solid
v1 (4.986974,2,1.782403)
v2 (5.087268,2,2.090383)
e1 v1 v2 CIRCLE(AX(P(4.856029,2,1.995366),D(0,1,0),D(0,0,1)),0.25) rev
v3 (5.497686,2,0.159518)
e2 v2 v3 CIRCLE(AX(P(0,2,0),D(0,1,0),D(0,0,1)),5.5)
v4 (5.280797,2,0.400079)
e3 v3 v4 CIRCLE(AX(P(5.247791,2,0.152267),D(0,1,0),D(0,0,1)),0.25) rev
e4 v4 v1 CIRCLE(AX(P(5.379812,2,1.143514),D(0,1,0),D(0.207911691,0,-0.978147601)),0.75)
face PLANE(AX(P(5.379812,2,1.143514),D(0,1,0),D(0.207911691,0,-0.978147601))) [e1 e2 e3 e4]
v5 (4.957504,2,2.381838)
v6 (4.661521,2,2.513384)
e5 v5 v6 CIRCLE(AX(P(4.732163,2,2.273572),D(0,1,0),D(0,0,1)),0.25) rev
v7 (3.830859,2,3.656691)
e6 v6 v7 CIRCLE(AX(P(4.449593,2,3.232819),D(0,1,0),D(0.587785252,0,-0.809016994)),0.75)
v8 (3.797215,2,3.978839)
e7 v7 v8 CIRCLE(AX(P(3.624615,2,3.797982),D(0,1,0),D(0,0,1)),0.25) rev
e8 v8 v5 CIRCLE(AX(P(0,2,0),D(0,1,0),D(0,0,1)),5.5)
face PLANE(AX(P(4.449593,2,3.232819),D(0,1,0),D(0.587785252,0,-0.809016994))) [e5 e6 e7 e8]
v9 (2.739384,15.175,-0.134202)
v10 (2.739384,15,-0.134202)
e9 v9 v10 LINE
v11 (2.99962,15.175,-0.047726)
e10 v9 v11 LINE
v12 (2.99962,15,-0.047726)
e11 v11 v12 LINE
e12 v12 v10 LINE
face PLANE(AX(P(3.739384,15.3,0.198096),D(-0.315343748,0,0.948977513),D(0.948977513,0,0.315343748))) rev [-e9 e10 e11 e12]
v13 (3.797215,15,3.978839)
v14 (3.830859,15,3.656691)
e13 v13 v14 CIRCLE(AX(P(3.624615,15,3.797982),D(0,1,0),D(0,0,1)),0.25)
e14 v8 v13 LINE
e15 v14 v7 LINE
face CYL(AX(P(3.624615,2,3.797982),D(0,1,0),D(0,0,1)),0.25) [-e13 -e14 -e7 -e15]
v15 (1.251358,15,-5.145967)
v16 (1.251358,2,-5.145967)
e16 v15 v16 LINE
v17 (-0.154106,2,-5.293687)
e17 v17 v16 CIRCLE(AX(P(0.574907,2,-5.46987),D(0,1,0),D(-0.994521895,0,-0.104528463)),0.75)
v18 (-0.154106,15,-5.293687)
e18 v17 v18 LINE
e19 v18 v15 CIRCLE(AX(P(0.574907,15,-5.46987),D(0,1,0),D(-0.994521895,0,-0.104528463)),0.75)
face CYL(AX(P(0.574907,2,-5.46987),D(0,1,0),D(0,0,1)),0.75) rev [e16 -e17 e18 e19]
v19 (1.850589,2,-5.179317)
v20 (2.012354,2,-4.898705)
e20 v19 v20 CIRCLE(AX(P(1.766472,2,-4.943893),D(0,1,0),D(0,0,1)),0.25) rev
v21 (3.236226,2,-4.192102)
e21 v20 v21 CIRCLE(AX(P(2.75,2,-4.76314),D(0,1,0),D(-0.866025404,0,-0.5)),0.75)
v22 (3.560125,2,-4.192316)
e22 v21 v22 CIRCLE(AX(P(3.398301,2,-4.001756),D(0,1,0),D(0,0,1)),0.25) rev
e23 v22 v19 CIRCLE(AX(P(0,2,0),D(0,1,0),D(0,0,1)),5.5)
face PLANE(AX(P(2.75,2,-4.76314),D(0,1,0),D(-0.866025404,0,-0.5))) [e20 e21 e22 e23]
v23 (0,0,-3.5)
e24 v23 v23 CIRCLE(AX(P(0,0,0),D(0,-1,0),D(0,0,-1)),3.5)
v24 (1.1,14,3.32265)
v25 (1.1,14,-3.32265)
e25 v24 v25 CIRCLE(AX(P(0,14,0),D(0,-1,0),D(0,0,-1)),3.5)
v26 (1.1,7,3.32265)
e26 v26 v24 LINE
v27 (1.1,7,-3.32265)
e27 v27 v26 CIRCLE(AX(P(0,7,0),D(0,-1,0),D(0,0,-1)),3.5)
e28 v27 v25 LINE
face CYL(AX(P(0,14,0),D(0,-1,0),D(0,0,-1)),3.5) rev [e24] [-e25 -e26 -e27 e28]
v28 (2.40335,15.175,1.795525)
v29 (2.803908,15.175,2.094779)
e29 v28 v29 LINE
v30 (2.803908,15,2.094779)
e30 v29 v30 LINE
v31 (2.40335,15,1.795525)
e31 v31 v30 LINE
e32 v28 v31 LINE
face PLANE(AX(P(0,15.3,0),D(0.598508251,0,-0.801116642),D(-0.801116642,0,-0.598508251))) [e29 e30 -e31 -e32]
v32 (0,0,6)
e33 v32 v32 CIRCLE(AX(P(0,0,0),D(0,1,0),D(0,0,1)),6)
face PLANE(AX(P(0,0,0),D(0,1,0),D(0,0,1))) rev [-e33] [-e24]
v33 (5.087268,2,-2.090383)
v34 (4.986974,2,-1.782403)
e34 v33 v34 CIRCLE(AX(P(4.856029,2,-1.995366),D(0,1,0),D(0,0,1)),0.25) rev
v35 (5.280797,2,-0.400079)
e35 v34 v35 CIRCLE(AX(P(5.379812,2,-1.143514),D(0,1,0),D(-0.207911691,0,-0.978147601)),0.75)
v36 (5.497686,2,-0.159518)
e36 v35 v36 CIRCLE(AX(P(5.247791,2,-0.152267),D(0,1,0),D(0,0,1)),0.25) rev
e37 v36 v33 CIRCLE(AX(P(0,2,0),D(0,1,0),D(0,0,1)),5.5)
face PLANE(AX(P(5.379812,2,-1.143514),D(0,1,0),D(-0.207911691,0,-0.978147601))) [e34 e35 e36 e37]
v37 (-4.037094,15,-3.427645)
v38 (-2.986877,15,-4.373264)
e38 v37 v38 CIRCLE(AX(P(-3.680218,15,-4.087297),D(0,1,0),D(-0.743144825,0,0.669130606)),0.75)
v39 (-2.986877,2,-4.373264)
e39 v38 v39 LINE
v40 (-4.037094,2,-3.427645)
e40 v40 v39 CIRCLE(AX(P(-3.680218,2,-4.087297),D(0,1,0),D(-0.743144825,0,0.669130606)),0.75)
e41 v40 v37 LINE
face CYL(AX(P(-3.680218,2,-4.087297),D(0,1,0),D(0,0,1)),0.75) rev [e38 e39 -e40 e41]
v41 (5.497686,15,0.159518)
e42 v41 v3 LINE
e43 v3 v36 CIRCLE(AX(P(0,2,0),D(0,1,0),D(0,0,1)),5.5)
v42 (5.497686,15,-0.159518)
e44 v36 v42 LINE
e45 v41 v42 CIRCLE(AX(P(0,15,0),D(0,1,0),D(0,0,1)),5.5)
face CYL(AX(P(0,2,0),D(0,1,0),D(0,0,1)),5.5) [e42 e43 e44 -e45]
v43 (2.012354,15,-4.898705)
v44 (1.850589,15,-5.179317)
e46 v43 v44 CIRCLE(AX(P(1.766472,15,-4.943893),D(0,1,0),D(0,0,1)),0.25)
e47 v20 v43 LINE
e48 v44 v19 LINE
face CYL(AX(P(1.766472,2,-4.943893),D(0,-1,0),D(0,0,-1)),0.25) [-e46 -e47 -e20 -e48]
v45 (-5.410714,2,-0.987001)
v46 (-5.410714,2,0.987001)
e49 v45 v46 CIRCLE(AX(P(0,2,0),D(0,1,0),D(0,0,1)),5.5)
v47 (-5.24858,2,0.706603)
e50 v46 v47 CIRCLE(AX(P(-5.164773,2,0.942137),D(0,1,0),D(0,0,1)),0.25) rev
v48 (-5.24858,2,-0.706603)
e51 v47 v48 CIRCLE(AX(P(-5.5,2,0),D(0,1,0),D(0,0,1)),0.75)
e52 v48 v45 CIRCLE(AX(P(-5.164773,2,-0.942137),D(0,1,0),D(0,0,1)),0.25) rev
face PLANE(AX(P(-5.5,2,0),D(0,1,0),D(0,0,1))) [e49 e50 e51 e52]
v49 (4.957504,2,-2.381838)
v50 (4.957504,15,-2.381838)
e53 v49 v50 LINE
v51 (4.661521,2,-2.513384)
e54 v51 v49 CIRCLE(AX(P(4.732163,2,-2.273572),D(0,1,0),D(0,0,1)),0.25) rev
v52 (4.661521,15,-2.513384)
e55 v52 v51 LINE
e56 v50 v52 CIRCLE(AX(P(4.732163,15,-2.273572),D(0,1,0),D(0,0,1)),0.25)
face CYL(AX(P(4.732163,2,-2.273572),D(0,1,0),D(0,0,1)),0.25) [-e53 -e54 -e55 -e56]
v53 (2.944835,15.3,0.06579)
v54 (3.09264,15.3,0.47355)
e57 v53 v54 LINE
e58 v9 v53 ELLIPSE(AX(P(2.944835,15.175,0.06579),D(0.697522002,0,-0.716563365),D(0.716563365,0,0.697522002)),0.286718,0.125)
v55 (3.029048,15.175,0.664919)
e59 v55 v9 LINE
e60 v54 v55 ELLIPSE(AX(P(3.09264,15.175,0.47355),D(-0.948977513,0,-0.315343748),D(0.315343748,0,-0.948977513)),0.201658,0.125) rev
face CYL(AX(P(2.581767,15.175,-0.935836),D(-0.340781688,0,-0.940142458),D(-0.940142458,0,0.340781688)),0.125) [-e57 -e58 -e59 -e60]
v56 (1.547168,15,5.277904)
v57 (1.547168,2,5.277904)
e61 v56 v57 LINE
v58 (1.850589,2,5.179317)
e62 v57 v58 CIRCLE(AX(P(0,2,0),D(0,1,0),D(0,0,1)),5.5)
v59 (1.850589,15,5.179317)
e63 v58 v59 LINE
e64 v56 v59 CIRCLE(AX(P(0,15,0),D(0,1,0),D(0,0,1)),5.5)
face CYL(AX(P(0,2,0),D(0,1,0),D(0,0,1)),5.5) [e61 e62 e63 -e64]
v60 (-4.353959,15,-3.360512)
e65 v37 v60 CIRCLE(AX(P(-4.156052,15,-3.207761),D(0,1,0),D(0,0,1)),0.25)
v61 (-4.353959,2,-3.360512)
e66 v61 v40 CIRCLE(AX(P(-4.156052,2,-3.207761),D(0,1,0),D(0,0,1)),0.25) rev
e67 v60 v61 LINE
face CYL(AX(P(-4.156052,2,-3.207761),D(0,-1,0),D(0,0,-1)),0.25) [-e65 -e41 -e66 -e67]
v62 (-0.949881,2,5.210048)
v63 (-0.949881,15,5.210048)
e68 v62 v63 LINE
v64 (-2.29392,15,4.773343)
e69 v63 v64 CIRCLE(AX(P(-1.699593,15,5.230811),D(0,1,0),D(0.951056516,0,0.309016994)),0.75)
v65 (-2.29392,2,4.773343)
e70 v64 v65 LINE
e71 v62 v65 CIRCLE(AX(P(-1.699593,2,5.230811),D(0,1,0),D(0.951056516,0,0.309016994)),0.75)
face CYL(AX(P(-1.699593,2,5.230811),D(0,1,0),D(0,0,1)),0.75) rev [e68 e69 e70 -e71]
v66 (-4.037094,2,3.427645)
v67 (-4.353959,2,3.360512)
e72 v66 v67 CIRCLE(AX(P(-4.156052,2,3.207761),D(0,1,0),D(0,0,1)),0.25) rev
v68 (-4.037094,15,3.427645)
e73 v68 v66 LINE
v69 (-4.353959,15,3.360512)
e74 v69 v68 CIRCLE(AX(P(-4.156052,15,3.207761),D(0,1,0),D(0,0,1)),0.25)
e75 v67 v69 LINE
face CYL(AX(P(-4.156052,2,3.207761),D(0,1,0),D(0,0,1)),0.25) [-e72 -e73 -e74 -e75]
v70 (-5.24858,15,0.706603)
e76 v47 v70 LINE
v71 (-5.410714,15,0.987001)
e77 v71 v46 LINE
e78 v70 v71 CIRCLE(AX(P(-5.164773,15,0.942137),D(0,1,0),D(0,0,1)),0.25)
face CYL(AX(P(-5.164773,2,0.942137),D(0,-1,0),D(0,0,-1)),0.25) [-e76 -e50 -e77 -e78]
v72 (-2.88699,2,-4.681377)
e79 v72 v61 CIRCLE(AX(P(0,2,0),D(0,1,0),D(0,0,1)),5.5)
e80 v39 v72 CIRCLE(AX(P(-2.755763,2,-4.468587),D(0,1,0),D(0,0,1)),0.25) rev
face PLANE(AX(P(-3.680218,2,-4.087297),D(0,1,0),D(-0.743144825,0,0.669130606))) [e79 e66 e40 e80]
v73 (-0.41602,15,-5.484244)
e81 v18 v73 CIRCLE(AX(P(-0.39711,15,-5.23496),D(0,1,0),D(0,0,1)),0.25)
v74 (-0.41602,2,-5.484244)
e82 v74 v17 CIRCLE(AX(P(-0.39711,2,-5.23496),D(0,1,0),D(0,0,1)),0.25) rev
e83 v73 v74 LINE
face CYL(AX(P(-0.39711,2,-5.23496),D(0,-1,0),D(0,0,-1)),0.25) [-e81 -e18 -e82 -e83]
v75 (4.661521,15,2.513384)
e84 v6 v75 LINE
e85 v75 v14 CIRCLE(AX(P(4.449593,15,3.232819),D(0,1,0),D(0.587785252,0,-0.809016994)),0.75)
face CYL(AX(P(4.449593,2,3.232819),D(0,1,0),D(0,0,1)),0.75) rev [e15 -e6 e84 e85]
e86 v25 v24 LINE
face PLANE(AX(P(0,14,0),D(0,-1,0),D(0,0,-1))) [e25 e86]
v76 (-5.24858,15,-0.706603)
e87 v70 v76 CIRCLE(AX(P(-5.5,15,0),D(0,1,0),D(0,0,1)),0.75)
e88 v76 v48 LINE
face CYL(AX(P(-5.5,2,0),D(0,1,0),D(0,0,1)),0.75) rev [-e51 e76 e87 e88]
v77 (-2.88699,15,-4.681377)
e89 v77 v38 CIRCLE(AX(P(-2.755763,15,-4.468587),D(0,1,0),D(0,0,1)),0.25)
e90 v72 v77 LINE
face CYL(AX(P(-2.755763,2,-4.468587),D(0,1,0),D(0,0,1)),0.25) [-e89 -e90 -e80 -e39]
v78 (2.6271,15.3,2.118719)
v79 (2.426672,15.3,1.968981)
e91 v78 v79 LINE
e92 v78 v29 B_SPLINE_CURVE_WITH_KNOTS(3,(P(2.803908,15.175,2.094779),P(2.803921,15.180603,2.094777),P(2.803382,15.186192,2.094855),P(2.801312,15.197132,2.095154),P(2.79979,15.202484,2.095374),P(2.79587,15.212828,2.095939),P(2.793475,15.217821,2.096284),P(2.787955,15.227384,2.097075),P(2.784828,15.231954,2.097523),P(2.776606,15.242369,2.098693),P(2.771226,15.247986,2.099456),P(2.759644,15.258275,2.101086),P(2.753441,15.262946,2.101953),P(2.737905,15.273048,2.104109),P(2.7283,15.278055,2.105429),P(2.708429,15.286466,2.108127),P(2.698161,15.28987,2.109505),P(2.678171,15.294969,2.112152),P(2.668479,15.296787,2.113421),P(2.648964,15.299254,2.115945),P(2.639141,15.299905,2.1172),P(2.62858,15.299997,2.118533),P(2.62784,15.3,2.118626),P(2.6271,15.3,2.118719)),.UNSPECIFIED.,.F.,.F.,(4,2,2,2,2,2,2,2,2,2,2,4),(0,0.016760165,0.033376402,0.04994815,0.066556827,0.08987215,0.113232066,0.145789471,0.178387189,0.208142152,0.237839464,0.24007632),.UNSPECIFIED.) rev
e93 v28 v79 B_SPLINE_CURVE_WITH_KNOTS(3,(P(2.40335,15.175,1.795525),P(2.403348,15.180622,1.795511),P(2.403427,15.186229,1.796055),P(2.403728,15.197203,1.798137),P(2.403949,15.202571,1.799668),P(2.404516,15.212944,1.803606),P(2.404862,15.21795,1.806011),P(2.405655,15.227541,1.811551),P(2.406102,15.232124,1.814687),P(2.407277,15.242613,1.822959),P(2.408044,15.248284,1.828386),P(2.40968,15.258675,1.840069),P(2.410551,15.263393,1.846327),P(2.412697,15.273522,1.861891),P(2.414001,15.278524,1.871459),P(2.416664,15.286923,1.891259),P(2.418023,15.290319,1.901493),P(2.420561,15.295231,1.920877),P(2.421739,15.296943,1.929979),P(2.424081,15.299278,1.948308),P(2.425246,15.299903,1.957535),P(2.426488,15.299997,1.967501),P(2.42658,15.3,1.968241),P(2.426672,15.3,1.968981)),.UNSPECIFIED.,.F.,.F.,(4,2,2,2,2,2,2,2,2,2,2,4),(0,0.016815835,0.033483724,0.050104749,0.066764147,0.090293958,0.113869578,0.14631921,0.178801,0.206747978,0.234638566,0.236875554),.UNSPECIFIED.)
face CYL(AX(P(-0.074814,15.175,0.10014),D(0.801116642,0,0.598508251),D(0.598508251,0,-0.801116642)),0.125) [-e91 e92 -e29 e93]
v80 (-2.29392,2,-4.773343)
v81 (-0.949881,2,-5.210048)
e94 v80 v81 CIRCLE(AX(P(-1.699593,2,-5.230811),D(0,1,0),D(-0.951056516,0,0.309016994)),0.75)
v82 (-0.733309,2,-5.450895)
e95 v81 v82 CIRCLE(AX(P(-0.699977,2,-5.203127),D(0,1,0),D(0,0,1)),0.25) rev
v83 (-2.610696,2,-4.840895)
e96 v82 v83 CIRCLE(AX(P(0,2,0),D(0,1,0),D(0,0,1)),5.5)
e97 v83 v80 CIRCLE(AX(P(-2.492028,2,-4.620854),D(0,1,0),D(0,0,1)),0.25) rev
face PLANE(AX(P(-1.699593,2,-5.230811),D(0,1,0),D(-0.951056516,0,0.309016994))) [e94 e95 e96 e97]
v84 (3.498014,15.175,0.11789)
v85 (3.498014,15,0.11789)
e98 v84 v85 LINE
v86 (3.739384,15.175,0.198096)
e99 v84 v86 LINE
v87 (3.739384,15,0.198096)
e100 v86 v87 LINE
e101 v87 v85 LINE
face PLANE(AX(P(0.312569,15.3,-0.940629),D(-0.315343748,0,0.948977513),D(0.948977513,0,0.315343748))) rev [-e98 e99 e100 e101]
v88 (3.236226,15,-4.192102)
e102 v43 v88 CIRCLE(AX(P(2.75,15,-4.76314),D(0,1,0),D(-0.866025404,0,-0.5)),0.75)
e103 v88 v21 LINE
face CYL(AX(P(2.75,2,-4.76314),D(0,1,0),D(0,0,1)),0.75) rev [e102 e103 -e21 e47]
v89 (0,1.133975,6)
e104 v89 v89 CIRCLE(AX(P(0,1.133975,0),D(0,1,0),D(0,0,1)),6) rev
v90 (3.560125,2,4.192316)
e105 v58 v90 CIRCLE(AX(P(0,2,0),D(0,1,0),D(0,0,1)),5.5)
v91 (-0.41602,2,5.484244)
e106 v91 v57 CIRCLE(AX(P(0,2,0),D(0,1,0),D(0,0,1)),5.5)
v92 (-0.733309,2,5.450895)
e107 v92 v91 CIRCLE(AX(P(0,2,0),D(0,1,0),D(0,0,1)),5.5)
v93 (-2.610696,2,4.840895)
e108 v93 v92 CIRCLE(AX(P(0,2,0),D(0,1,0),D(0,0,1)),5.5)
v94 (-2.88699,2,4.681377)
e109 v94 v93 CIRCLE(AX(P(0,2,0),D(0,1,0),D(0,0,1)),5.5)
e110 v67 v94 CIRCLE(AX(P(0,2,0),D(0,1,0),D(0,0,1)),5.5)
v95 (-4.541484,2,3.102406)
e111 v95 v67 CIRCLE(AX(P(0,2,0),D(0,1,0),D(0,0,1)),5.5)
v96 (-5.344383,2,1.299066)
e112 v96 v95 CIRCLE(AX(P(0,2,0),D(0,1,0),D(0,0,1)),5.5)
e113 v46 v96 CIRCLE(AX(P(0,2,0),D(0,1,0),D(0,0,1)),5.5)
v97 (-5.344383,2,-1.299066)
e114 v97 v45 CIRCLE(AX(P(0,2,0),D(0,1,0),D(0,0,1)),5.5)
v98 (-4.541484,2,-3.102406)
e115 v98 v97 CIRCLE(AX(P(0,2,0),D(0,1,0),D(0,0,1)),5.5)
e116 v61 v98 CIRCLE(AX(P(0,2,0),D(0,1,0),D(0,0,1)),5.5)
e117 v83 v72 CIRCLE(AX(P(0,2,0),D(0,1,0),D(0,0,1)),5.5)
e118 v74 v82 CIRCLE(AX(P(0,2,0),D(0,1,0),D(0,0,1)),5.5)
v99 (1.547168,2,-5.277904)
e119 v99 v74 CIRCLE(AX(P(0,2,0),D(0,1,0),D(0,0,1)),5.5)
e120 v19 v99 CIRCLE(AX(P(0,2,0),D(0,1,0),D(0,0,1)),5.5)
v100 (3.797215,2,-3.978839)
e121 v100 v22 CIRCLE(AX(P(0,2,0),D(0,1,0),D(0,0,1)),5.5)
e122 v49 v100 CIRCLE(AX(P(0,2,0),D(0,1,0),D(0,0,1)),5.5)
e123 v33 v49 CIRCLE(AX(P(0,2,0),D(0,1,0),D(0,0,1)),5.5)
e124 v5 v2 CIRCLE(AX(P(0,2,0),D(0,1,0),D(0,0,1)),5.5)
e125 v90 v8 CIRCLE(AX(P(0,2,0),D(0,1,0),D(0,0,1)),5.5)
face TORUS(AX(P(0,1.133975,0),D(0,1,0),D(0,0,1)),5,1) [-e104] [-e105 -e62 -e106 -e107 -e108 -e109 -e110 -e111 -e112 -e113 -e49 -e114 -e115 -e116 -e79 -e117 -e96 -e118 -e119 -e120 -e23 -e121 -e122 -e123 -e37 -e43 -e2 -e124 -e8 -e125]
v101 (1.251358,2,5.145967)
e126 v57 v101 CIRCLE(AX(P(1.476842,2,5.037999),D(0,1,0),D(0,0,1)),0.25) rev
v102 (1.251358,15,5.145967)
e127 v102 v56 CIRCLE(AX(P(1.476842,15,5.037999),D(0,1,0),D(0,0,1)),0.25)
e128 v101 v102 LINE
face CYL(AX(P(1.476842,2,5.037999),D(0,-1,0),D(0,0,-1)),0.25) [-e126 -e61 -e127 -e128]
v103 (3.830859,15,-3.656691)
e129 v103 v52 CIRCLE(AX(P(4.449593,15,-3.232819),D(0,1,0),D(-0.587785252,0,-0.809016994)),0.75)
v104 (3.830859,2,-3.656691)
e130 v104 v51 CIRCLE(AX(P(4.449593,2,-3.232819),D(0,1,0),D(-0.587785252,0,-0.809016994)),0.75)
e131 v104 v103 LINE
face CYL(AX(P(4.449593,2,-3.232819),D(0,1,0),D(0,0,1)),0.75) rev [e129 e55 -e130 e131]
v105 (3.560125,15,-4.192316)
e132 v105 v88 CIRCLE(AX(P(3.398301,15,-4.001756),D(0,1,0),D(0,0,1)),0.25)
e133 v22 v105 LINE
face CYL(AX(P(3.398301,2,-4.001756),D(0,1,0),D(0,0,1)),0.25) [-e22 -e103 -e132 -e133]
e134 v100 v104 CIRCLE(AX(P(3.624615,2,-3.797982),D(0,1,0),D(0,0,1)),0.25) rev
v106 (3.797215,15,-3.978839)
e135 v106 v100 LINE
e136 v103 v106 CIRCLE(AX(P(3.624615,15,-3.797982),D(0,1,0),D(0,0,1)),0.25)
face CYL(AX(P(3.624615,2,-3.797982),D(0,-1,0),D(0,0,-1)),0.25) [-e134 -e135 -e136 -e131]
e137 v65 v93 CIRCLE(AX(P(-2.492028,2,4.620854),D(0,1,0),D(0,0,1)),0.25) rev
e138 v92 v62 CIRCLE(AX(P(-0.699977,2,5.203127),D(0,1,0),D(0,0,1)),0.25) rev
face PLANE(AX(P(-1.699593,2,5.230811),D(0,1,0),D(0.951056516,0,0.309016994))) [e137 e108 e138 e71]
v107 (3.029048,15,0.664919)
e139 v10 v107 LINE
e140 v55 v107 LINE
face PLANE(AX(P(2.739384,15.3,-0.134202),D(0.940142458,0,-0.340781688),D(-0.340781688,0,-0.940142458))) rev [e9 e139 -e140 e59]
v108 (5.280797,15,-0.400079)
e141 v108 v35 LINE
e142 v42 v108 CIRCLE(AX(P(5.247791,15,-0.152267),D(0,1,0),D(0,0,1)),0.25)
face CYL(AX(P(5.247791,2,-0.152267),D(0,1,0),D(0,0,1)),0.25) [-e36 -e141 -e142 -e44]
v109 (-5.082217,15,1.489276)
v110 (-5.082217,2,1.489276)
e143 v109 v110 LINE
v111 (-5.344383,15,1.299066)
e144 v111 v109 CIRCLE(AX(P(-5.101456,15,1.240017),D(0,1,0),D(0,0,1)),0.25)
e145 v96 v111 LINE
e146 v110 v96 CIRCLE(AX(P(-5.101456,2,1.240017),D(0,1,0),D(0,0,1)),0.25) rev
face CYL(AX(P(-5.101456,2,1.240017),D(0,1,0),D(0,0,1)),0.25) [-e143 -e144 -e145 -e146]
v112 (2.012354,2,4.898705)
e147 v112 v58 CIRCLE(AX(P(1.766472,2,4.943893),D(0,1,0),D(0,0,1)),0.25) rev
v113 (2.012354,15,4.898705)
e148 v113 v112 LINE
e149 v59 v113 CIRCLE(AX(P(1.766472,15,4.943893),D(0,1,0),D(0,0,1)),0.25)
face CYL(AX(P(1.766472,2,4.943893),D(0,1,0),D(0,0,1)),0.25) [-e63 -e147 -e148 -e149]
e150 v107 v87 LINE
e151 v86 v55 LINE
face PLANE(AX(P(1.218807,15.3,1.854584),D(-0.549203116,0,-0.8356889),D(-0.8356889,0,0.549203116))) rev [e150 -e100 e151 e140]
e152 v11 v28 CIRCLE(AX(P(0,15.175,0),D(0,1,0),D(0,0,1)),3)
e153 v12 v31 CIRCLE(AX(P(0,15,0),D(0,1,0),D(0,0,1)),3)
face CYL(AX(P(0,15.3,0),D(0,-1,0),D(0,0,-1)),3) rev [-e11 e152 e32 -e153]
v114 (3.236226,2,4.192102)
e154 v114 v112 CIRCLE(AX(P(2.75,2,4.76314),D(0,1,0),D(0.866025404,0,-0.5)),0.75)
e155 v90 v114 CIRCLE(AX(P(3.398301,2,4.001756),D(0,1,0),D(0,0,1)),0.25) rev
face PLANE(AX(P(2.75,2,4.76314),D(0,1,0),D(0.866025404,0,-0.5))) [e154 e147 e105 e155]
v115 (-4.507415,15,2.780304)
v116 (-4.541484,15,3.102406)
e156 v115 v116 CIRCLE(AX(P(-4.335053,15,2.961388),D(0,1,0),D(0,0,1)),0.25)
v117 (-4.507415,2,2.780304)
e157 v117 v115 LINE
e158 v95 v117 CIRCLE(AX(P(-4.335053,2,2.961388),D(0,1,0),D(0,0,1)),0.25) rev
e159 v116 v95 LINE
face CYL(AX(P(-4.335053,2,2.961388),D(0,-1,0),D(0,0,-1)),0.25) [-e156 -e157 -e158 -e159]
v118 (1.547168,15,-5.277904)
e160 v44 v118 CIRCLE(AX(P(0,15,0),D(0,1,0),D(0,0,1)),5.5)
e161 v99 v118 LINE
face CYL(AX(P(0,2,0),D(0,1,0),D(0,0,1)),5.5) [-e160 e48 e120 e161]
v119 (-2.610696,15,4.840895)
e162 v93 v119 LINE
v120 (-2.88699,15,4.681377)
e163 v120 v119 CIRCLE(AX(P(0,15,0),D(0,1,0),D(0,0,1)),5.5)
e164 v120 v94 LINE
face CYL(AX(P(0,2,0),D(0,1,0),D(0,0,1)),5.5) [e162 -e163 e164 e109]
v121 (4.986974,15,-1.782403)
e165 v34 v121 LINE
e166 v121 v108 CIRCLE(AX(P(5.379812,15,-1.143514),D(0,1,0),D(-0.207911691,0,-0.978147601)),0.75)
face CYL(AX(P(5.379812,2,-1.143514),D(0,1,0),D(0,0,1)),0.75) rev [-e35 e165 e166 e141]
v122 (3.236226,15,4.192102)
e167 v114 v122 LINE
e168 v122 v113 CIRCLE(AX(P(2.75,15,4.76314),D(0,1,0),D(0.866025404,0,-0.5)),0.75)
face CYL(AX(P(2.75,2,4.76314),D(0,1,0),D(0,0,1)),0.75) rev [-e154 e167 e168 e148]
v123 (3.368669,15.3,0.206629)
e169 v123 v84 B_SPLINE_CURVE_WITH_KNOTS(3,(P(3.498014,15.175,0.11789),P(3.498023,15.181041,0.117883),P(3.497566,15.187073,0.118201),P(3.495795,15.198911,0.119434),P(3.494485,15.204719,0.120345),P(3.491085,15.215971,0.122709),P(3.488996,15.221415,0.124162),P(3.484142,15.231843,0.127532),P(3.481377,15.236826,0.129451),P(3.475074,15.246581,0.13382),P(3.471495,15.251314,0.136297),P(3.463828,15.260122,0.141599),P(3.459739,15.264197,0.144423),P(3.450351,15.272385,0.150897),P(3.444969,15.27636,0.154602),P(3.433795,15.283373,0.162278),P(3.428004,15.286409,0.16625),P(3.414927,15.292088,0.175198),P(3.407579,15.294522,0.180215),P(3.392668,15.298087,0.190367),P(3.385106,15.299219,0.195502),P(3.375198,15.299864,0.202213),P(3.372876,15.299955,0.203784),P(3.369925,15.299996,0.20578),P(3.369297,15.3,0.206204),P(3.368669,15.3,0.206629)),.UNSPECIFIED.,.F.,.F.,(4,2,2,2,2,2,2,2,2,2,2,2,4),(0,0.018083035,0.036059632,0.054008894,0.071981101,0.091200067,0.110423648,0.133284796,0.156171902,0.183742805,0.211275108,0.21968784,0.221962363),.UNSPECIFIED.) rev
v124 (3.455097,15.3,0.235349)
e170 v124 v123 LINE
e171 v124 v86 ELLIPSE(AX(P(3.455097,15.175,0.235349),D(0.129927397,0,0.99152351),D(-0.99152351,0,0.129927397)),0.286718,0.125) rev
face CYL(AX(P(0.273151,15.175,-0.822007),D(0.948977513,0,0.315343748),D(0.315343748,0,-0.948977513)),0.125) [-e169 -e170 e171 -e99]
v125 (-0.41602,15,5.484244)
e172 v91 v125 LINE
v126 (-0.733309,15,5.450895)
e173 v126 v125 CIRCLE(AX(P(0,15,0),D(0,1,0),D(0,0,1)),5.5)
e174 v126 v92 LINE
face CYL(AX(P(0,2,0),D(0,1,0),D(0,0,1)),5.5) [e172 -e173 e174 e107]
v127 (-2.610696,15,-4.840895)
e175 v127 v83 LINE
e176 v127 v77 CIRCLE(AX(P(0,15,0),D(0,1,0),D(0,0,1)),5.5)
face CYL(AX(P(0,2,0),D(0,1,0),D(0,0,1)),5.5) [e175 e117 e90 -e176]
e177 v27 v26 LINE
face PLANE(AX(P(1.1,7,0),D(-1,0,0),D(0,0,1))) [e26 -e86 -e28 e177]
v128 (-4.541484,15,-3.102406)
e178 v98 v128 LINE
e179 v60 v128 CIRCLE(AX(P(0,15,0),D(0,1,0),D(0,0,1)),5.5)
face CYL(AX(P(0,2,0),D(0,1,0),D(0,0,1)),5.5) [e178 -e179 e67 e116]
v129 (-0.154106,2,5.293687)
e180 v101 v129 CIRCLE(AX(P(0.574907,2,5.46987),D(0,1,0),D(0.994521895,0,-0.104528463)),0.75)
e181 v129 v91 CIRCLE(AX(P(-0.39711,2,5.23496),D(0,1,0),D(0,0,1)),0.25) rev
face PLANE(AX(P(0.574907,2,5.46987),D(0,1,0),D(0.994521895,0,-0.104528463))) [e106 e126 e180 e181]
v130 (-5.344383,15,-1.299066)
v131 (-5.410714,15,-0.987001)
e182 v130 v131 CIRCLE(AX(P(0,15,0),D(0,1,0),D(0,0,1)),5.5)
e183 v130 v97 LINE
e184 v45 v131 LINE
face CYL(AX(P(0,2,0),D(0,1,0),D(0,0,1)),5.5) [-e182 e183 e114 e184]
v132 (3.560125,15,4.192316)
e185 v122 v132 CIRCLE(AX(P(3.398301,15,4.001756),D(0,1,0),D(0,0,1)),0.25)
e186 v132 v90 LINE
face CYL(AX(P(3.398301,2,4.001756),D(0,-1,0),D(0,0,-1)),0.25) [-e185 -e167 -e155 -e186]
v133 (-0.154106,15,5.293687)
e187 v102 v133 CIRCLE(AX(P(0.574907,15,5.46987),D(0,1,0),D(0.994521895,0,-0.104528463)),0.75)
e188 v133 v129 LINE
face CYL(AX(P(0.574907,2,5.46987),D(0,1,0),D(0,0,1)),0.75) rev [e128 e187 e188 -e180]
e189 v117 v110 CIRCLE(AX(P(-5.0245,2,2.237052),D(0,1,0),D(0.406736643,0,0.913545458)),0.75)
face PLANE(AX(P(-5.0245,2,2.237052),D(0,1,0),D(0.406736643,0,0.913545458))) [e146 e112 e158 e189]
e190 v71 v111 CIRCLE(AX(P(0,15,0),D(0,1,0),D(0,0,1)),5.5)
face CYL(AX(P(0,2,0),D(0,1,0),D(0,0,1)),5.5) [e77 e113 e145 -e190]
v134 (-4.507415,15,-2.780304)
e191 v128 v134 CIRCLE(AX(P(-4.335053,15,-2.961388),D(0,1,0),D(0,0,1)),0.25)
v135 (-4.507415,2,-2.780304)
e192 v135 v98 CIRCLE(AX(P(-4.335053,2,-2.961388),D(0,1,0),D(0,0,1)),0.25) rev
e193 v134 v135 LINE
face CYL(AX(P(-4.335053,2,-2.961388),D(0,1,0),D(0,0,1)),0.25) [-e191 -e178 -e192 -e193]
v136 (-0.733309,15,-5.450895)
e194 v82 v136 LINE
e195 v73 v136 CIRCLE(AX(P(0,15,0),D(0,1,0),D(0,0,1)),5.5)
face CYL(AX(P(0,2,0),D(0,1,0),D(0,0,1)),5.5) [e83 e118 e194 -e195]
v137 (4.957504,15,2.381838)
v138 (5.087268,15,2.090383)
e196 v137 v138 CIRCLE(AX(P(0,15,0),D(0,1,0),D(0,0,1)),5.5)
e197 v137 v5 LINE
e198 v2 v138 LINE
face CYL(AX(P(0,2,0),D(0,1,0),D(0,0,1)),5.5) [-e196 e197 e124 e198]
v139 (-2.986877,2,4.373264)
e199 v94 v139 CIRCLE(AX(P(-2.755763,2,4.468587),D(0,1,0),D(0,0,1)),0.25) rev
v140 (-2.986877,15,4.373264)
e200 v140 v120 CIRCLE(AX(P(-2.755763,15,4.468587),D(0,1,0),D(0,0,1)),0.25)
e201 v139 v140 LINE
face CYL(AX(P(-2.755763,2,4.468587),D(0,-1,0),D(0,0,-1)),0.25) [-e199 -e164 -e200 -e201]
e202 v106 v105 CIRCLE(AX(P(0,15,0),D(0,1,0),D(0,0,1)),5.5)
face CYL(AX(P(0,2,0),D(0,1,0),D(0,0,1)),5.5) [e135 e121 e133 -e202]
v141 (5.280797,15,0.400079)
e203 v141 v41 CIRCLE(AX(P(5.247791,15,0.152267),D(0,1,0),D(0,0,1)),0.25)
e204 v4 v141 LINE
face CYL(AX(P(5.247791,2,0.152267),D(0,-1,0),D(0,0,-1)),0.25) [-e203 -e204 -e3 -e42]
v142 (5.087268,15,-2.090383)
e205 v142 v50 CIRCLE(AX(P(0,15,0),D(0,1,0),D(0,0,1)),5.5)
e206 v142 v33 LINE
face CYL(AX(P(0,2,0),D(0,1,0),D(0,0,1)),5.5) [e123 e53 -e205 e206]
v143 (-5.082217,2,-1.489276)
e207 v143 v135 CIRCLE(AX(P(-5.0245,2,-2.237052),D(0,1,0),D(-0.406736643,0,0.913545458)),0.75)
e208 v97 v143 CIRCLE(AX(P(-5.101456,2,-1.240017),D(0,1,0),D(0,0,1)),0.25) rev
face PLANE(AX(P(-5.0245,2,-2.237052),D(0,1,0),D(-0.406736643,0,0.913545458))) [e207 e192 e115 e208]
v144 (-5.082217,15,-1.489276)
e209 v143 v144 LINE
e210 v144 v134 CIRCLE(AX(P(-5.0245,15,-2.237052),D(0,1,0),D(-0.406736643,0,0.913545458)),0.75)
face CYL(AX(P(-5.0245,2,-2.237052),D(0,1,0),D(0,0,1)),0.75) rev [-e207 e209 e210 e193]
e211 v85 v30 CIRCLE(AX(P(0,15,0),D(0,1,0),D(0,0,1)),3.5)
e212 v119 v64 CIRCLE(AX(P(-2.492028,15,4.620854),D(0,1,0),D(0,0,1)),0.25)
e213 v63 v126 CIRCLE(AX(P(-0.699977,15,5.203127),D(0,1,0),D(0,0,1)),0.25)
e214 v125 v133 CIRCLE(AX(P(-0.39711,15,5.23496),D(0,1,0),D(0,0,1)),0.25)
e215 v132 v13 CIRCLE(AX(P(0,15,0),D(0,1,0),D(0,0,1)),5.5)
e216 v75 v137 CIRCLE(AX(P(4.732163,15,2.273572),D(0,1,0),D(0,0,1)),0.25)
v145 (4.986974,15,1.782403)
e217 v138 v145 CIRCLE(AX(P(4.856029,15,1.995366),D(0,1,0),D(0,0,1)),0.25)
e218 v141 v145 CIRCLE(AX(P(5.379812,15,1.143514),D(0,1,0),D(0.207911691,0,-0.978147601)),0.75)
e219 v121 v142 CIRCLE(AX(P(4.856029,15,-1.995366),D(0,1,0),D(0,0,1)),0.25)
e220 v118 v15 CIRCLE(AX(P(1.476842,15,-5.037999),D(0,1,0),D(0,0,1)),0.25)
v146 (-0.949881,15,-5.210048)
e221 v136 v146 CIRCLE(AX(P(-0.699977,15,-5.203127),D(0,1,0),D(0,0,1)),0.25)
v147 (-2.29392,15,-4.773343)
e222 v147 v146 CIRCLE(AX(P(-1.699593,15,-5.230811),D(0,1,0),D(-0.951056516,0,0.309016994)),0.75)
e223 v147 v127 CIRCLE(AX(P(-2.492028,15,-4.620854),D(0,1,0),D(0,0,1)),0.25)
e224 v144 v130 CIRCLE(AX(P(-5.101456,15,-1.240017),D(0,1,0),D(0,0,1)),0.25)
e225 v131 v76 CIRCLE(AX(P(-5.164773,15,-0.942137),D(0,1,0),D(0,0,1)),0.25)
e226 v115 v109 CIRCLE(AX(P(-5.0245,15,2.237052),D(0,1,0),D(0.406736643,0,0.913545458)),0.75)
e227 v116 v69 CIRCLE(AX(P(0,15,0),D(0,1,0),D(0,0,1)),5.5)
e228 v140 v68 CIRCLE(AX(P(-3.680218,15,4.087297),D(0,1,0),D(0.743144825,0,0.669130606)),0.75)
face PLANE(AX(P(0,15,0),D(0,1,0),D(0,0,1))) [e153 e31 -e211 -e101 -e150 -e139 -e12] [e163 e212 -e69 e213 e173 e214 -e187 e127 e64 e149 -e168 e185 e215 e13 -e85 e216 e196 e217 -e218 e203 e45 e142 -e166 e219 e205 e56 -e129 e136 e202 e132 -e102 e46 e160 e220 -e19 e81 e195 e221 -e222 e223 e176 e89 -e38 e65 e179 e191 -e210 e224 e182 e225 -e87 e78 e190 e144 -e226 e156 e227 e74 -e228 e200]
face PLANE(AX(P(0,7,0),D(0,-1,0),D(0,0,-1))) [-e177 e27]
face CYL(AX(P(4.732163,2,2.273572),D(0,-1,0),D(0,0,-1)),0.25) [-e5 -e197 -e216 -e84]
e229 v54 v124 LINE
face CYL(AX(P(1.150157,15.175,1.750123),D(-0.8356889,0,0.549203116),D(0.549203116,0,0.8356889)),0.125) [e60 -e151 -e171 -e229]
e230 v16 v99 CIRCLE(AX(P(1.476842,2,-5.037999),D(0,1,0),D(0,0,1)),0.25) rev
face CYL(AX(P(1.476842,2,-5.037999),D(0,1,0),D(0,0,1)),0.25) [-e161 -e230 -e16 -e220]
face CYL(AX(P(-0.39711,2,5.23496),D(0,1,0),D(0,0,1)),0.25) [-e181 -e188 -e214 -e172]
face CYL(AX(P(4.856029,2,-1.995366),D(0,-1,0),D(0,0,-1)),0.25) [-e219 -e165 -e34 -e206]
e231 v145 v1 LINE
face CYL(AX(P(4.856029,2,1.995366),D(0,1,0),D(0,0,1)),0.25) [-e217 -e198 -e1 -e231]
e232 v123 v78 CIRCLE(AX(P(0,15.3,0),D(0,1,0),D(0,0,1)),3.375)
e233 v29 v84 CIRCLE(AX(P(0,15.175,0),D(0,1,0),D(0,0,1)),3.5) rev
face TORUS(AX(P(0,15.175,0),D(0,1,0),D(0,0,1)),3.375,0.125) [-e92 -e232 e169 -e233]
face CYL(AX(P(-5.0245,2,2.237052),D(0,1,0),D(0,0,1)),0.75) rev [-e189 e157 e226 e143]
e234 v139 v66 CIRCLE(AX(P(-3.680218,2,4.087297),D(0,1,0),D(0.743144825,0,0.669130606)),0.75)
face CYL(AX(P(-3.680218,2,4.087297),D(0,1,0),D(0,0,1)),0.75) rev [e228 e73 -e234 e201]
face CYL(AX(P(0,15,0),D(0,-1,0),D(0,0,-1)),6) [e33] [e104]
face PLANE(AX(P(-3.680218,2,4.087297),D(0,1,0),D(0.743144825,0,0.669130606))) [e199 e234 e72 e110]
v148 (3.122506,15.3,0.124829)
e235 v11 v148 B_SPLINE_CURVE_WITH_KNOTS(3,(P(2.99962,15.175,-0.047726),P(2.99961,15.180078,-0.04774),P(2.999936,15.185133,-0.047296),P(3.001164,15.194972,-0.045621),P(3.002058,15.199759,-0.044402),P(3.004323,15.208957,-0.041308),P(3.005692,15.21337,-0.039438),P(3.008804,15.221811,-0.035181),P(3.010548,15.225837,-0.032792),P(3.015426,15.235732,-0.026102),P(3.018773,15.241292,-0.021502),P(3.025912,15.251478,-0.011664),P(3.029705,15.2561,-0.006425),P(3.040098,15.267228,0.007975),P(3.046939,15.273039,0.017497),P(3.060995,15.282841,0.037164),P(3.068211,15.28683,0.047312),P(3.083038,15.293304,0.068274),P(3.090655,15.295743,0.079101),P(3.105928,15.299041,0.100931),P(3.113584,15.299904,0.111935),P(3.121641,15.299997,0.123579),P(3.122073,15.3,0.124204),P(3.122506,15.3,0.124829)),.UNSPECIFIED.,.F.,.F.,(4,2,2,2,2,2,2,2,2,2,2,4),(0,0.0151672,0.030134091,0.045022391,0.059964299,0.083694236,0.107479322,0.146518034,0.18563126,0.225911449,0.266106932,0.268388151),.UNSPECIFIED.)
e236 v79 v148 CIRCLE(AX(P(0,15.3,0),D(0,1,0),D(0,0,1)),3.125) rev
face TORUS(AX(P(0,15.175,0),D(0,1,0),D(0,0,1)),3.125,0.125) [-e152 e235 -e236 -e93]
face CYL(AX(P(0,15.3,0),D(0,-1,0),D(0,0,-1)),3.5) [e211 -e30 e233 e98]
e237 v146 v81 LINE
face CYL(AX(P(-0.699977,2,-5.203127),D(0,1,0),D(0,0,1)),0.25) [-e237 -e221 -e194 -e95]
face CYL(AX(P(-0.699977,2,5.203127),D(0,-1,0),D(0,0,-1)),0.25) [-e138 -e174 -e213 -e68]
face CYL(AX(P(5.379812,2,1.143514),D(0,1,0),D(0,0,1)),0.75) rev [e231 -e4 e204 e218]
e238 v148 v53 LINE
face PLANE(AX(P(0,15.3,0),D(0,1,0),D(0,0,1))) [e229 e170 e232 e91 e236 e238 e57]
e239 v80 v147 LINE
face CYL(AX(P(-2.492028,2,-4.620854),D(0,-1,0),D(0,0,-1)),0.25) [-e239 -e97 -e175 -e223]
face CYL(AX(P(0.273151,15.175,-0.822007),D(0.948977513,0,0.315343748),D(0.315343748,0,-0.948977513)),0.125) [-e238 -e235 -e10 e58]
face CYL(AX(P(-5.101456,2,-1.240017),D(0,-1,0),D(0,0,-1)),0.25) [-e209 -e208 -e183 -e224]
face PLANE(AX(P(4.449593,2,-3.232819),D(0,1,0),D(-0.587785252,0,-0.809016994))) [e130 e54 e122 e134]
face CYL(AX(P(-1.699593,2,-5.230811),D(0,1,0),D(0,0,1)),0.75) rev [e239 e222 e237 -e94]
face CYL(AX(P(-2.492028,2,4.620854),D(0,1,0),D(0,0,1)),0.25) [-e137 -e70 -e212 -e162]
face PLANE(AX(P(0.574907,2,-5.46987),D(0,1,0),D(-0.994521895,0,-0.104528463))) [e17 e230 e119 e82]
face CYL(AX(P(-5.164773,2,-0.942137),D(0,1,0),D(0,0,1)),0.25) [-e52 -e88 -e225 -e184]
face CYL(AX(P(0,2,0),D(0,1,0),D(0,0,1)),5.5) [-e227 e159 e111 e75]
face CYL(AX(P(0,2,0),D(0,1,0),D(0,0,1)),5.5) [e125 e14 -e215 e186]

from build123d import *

# Parameters (mm, degrees)
SKETCH1_R                = 6
BOSS_EXTRUDE1_DEPTH      = 15
CUT_EXTRUDE1_START       = -13
SKETCH2_R                = 6
SKETCH2_R_2              = 5.5
CUT_EXTRUDE1_DEPTH       = 13
FILLET1_R                = 1
SKETCH3_R                = 0.75
CUT_EXTRUDE2_DEPTH       = 13
FILLET2_R                = 0.25
CIRPATTERN1_COUNT        = 15
FILLET2_OF_CIRPATTERN1_R = 0.25
SKETCH4_R                = 3.5
CUT_EXTRUDE3_DEPTH       = 14
BOSS_EXTRUDE2_START      = 7
BOSS_EXTRUDE2_DEPTH      = 7
BOSS_EXTRUDE4_DEPTH      = 0.3
FILLET5_R                = 0.125


with BuildPart() as part:
    # Sketch1 → Boss-Extrude1 (new body)
    with BuildSketch(Plane(origin=(0, 0, 0), x_dir=(1, 0, 0), z_dir=(0, 1, 0))):
        with Locations(Location((0, 0, 0), (0, 0, 270))):
            Circle(SKETCH1_R)
    extrude(amount=BOSS_EXTRUDE1_DEPTH)

    # Sketch2 → Cut-Extrude1 (cut)
    with BuildSketch(Plane(origin=(0, 15, 0), x_dir=(1, 0, 0), z_dir=(0, 1, 0)).offset(CUT_EXTRUDE1_START)):
        with Locations(Location((0, 0, 0), (0, 0, 270))):
            Circle(SKETCH2_R)
        with Locations(Location((0, 0, 0), (0, 0, 270))):
            Circle(SKETCH2_R_2, mode=Mode.SUBTRACT)
    extrude(amount=CUT_EXTRUDE1_DEPTH, mode=Mode.SUBTRACT)

    # Fillet1
    # the kernel refuses this fillet: 1 mm, written as the material it takes off along each edge
    with BuildSketch(Plane(origin=(0, 2, 0), x_dir=(0, 0, 1), z_dir=(-1, 0, 0))) as fillet1_piece_1:
        with BuildLine():
            CenterArc((5, -0.866025404), FILLET1_R, 0, 60)
            Line((5.5, 0), (5.51, 0.017320508))
            ThreePointArc((5.51, 0.017320508), (5.75, 0.02), (6, 0.02))
            Line((6, 0.02), (6.02, 0))
            Line((6.02, 0), (6.02, -0.866025404))
            Line((6.02, -0.866025404), (6, -0.866025404))
        make_face()
    revolve(axis=Axis((0, 2, 0), (0, 1, 0)), mode=Mode.SUBTRACT)

    # Sketch3 → Cut-Extrude2 (cut)
    with BuildSketch(Plane(origin=(0, 15, 0), x_dir=(1, 0, 0), z_dir=(0, 1, 0))):
        with Locations((-5.5, 0)):
            Circle(SKETCH3_R)
    cut_extrude2 = extrude(amount=-CUT_EXTRUDE2_DEPTH, mode=Mode.SUBTRACT)

    # Fillet2
    fillet2_edges = [part.edges().sort_by_distance(p)[0] for p in [
        (-5.448863636, 8.5, 0.748254684),
        (-5.448863636, 8.5, -0.748254684),
    ]]
    fillet(fillet2_edges, radius=FILLET2_R)

    # CirPattern1: Cut-Extrude2 ×15 about axis
    cirpattern1_axis = Axis((0, 0, 0), (0, 1, 0))
    for i in range(1, CIRPATTERN1_COUNT):
        add(cut_extrude2.rotate(cirpattern1_axis, i * 360 / CIRPATTERN1_COUNT), mode=Mode.SUBTRACT)

    # Fillet2 of CirPattern1
    fillet2_of_cirpattern1_edges = [part.edges().sort_by_distance(p)[0] for p in [
        (-4.673442026, 8.5, 2.899817172),
        (-5.282127223, 8.5, 1.532687836),
        (-3.089939832, 8.5, 4.549974927),
        (-4.202063026, 8.5, 3.548614706),
        (-0.97215897, 8.5, 5.413400681),
        (-2.395423957, 8.5, 4.950953854),
        (1.313717009, 8.5, 5.340800279),
        (-0.174594324, 8.5, 5.497228104),
        (3.372439383, 8.5, 4.344726989),
        (2.076424253, 8.5, 5.092981673),
        (4.84803635, 8.5, 2.597410932),
        (3.968410214, 8.5, 3.808112443),
        (5.485363789, 8.5, 0.400978928),
        (5.174221996, 8.5, 1.864785976),
        (5.174221996, 8.5, -1.864785976),
        (5.485363789, 8.5, -0.400978928),
        (3.968410214, 8.5, -3.808112443),
        (4.84803635, 8.5, -2.597410932),
        (2.076424253, 8.5, -5.092981673),
        (3.372439383, 8.5, -4.344726989),
        (-0.174594324, 8.5, -5.497228104),
        (1.313717009, 8.5, -5.340800279),
        (-2.395423957, 8.5, -4.950953854),
        (-0.97215897, 8.5, -5.413400681),
        (-4.202063026, 8.5, -3.548614706),
        (-3.089939832, 8.5, -4.549974927),
        (-5.282127223, 8.5, -1.532687836),
        (-4.673442026, 8.5, -2.899817172),
    ]]
    fillet(fillet2_of_cirpattern1_edges, radius=FILLET2_OF_CIRPATTERN1_R)

    # Sketch4 → Cut-Extrude3 (cut)
    with BuildSketch(Plane.XZ):
        with Locations(Location((0, 0, 0), (0, 0, 270))):
            Circle(SKETCH4_R)
    extrude(amount=-CUT_EXTRUDE3_DEPTH, mode=Mode.SUBTRACT)

    # Sketch5 → Boss-Extrude2 (add)
    with BuildSketch(Plane.XZ.offset(-14).offset(BOSS_EXTRUDE2_START)):
        with BuildLine():
            Line((1.1, -0.635085296), (1.1, -3.322649545))
            ThreePointArc((1.1, -3.322649545), (3.5, 0), (1.1, 3.322649545))
            Line((1.1, 3.322649545), (1.1, -0.635085296))
        make_face()
    extrude(amount=-BOSS_EXTRUDE2_DEPTH)

    # Sketch7 → Boss-Extrude4 (add)
    with BuildSketch(Plane(origin=(0, 15, 0), x_dir=(1, 0, 0), z_dir=(0, 1, 0))):
        with BuildLine():
            Line((3.029048445, -0.664919024), (3.73938401, -0.198096375))
            Line((3.73938401, -0.198096375), (3.498014017, -0.117889503))
            ThreePointArc((3.498014017, -0.117889503), (-3.302359604, 1.159491719), (2.803908246, -2.094778878))
            Line((2.803908246, -2.094778878), (2.403349925, -1.795524752))
            ThreePointArc((2.403349925, -1.795524752), (-2.854367744, 0.923355176), (2.999620348, 0.047725935))
            Line((2.999620348, 0.047725935), (2.73938401, 0.134202065))
            Line((2.73938401, 0.134202065), (3.029048445, -0.664919024))
        make_face()
    extrude(amount=BOSS_EXTRUDE4_DEPTH)

    # Fillet5
    fillet5_edges = [part.edges().sort_by_distance(p)[0] for p in [
        (2.869502179, 15.3, -0.090964),
        (2.884216228, 15.3, 0.26535848),
        (3.384216228, 15.3, 0.4315077),
        (3.618699014, 15.3, 0.157992939),
        (-3.302359604, 15.3, -1.159491719),
        (2.603629086, 15.3, 1.945151815),
        (-2.854367744, 15.3, -0.923355176),
    ]]
    fillet(fillet5_edges, radius=FILLET5_R)


solid = part.part
